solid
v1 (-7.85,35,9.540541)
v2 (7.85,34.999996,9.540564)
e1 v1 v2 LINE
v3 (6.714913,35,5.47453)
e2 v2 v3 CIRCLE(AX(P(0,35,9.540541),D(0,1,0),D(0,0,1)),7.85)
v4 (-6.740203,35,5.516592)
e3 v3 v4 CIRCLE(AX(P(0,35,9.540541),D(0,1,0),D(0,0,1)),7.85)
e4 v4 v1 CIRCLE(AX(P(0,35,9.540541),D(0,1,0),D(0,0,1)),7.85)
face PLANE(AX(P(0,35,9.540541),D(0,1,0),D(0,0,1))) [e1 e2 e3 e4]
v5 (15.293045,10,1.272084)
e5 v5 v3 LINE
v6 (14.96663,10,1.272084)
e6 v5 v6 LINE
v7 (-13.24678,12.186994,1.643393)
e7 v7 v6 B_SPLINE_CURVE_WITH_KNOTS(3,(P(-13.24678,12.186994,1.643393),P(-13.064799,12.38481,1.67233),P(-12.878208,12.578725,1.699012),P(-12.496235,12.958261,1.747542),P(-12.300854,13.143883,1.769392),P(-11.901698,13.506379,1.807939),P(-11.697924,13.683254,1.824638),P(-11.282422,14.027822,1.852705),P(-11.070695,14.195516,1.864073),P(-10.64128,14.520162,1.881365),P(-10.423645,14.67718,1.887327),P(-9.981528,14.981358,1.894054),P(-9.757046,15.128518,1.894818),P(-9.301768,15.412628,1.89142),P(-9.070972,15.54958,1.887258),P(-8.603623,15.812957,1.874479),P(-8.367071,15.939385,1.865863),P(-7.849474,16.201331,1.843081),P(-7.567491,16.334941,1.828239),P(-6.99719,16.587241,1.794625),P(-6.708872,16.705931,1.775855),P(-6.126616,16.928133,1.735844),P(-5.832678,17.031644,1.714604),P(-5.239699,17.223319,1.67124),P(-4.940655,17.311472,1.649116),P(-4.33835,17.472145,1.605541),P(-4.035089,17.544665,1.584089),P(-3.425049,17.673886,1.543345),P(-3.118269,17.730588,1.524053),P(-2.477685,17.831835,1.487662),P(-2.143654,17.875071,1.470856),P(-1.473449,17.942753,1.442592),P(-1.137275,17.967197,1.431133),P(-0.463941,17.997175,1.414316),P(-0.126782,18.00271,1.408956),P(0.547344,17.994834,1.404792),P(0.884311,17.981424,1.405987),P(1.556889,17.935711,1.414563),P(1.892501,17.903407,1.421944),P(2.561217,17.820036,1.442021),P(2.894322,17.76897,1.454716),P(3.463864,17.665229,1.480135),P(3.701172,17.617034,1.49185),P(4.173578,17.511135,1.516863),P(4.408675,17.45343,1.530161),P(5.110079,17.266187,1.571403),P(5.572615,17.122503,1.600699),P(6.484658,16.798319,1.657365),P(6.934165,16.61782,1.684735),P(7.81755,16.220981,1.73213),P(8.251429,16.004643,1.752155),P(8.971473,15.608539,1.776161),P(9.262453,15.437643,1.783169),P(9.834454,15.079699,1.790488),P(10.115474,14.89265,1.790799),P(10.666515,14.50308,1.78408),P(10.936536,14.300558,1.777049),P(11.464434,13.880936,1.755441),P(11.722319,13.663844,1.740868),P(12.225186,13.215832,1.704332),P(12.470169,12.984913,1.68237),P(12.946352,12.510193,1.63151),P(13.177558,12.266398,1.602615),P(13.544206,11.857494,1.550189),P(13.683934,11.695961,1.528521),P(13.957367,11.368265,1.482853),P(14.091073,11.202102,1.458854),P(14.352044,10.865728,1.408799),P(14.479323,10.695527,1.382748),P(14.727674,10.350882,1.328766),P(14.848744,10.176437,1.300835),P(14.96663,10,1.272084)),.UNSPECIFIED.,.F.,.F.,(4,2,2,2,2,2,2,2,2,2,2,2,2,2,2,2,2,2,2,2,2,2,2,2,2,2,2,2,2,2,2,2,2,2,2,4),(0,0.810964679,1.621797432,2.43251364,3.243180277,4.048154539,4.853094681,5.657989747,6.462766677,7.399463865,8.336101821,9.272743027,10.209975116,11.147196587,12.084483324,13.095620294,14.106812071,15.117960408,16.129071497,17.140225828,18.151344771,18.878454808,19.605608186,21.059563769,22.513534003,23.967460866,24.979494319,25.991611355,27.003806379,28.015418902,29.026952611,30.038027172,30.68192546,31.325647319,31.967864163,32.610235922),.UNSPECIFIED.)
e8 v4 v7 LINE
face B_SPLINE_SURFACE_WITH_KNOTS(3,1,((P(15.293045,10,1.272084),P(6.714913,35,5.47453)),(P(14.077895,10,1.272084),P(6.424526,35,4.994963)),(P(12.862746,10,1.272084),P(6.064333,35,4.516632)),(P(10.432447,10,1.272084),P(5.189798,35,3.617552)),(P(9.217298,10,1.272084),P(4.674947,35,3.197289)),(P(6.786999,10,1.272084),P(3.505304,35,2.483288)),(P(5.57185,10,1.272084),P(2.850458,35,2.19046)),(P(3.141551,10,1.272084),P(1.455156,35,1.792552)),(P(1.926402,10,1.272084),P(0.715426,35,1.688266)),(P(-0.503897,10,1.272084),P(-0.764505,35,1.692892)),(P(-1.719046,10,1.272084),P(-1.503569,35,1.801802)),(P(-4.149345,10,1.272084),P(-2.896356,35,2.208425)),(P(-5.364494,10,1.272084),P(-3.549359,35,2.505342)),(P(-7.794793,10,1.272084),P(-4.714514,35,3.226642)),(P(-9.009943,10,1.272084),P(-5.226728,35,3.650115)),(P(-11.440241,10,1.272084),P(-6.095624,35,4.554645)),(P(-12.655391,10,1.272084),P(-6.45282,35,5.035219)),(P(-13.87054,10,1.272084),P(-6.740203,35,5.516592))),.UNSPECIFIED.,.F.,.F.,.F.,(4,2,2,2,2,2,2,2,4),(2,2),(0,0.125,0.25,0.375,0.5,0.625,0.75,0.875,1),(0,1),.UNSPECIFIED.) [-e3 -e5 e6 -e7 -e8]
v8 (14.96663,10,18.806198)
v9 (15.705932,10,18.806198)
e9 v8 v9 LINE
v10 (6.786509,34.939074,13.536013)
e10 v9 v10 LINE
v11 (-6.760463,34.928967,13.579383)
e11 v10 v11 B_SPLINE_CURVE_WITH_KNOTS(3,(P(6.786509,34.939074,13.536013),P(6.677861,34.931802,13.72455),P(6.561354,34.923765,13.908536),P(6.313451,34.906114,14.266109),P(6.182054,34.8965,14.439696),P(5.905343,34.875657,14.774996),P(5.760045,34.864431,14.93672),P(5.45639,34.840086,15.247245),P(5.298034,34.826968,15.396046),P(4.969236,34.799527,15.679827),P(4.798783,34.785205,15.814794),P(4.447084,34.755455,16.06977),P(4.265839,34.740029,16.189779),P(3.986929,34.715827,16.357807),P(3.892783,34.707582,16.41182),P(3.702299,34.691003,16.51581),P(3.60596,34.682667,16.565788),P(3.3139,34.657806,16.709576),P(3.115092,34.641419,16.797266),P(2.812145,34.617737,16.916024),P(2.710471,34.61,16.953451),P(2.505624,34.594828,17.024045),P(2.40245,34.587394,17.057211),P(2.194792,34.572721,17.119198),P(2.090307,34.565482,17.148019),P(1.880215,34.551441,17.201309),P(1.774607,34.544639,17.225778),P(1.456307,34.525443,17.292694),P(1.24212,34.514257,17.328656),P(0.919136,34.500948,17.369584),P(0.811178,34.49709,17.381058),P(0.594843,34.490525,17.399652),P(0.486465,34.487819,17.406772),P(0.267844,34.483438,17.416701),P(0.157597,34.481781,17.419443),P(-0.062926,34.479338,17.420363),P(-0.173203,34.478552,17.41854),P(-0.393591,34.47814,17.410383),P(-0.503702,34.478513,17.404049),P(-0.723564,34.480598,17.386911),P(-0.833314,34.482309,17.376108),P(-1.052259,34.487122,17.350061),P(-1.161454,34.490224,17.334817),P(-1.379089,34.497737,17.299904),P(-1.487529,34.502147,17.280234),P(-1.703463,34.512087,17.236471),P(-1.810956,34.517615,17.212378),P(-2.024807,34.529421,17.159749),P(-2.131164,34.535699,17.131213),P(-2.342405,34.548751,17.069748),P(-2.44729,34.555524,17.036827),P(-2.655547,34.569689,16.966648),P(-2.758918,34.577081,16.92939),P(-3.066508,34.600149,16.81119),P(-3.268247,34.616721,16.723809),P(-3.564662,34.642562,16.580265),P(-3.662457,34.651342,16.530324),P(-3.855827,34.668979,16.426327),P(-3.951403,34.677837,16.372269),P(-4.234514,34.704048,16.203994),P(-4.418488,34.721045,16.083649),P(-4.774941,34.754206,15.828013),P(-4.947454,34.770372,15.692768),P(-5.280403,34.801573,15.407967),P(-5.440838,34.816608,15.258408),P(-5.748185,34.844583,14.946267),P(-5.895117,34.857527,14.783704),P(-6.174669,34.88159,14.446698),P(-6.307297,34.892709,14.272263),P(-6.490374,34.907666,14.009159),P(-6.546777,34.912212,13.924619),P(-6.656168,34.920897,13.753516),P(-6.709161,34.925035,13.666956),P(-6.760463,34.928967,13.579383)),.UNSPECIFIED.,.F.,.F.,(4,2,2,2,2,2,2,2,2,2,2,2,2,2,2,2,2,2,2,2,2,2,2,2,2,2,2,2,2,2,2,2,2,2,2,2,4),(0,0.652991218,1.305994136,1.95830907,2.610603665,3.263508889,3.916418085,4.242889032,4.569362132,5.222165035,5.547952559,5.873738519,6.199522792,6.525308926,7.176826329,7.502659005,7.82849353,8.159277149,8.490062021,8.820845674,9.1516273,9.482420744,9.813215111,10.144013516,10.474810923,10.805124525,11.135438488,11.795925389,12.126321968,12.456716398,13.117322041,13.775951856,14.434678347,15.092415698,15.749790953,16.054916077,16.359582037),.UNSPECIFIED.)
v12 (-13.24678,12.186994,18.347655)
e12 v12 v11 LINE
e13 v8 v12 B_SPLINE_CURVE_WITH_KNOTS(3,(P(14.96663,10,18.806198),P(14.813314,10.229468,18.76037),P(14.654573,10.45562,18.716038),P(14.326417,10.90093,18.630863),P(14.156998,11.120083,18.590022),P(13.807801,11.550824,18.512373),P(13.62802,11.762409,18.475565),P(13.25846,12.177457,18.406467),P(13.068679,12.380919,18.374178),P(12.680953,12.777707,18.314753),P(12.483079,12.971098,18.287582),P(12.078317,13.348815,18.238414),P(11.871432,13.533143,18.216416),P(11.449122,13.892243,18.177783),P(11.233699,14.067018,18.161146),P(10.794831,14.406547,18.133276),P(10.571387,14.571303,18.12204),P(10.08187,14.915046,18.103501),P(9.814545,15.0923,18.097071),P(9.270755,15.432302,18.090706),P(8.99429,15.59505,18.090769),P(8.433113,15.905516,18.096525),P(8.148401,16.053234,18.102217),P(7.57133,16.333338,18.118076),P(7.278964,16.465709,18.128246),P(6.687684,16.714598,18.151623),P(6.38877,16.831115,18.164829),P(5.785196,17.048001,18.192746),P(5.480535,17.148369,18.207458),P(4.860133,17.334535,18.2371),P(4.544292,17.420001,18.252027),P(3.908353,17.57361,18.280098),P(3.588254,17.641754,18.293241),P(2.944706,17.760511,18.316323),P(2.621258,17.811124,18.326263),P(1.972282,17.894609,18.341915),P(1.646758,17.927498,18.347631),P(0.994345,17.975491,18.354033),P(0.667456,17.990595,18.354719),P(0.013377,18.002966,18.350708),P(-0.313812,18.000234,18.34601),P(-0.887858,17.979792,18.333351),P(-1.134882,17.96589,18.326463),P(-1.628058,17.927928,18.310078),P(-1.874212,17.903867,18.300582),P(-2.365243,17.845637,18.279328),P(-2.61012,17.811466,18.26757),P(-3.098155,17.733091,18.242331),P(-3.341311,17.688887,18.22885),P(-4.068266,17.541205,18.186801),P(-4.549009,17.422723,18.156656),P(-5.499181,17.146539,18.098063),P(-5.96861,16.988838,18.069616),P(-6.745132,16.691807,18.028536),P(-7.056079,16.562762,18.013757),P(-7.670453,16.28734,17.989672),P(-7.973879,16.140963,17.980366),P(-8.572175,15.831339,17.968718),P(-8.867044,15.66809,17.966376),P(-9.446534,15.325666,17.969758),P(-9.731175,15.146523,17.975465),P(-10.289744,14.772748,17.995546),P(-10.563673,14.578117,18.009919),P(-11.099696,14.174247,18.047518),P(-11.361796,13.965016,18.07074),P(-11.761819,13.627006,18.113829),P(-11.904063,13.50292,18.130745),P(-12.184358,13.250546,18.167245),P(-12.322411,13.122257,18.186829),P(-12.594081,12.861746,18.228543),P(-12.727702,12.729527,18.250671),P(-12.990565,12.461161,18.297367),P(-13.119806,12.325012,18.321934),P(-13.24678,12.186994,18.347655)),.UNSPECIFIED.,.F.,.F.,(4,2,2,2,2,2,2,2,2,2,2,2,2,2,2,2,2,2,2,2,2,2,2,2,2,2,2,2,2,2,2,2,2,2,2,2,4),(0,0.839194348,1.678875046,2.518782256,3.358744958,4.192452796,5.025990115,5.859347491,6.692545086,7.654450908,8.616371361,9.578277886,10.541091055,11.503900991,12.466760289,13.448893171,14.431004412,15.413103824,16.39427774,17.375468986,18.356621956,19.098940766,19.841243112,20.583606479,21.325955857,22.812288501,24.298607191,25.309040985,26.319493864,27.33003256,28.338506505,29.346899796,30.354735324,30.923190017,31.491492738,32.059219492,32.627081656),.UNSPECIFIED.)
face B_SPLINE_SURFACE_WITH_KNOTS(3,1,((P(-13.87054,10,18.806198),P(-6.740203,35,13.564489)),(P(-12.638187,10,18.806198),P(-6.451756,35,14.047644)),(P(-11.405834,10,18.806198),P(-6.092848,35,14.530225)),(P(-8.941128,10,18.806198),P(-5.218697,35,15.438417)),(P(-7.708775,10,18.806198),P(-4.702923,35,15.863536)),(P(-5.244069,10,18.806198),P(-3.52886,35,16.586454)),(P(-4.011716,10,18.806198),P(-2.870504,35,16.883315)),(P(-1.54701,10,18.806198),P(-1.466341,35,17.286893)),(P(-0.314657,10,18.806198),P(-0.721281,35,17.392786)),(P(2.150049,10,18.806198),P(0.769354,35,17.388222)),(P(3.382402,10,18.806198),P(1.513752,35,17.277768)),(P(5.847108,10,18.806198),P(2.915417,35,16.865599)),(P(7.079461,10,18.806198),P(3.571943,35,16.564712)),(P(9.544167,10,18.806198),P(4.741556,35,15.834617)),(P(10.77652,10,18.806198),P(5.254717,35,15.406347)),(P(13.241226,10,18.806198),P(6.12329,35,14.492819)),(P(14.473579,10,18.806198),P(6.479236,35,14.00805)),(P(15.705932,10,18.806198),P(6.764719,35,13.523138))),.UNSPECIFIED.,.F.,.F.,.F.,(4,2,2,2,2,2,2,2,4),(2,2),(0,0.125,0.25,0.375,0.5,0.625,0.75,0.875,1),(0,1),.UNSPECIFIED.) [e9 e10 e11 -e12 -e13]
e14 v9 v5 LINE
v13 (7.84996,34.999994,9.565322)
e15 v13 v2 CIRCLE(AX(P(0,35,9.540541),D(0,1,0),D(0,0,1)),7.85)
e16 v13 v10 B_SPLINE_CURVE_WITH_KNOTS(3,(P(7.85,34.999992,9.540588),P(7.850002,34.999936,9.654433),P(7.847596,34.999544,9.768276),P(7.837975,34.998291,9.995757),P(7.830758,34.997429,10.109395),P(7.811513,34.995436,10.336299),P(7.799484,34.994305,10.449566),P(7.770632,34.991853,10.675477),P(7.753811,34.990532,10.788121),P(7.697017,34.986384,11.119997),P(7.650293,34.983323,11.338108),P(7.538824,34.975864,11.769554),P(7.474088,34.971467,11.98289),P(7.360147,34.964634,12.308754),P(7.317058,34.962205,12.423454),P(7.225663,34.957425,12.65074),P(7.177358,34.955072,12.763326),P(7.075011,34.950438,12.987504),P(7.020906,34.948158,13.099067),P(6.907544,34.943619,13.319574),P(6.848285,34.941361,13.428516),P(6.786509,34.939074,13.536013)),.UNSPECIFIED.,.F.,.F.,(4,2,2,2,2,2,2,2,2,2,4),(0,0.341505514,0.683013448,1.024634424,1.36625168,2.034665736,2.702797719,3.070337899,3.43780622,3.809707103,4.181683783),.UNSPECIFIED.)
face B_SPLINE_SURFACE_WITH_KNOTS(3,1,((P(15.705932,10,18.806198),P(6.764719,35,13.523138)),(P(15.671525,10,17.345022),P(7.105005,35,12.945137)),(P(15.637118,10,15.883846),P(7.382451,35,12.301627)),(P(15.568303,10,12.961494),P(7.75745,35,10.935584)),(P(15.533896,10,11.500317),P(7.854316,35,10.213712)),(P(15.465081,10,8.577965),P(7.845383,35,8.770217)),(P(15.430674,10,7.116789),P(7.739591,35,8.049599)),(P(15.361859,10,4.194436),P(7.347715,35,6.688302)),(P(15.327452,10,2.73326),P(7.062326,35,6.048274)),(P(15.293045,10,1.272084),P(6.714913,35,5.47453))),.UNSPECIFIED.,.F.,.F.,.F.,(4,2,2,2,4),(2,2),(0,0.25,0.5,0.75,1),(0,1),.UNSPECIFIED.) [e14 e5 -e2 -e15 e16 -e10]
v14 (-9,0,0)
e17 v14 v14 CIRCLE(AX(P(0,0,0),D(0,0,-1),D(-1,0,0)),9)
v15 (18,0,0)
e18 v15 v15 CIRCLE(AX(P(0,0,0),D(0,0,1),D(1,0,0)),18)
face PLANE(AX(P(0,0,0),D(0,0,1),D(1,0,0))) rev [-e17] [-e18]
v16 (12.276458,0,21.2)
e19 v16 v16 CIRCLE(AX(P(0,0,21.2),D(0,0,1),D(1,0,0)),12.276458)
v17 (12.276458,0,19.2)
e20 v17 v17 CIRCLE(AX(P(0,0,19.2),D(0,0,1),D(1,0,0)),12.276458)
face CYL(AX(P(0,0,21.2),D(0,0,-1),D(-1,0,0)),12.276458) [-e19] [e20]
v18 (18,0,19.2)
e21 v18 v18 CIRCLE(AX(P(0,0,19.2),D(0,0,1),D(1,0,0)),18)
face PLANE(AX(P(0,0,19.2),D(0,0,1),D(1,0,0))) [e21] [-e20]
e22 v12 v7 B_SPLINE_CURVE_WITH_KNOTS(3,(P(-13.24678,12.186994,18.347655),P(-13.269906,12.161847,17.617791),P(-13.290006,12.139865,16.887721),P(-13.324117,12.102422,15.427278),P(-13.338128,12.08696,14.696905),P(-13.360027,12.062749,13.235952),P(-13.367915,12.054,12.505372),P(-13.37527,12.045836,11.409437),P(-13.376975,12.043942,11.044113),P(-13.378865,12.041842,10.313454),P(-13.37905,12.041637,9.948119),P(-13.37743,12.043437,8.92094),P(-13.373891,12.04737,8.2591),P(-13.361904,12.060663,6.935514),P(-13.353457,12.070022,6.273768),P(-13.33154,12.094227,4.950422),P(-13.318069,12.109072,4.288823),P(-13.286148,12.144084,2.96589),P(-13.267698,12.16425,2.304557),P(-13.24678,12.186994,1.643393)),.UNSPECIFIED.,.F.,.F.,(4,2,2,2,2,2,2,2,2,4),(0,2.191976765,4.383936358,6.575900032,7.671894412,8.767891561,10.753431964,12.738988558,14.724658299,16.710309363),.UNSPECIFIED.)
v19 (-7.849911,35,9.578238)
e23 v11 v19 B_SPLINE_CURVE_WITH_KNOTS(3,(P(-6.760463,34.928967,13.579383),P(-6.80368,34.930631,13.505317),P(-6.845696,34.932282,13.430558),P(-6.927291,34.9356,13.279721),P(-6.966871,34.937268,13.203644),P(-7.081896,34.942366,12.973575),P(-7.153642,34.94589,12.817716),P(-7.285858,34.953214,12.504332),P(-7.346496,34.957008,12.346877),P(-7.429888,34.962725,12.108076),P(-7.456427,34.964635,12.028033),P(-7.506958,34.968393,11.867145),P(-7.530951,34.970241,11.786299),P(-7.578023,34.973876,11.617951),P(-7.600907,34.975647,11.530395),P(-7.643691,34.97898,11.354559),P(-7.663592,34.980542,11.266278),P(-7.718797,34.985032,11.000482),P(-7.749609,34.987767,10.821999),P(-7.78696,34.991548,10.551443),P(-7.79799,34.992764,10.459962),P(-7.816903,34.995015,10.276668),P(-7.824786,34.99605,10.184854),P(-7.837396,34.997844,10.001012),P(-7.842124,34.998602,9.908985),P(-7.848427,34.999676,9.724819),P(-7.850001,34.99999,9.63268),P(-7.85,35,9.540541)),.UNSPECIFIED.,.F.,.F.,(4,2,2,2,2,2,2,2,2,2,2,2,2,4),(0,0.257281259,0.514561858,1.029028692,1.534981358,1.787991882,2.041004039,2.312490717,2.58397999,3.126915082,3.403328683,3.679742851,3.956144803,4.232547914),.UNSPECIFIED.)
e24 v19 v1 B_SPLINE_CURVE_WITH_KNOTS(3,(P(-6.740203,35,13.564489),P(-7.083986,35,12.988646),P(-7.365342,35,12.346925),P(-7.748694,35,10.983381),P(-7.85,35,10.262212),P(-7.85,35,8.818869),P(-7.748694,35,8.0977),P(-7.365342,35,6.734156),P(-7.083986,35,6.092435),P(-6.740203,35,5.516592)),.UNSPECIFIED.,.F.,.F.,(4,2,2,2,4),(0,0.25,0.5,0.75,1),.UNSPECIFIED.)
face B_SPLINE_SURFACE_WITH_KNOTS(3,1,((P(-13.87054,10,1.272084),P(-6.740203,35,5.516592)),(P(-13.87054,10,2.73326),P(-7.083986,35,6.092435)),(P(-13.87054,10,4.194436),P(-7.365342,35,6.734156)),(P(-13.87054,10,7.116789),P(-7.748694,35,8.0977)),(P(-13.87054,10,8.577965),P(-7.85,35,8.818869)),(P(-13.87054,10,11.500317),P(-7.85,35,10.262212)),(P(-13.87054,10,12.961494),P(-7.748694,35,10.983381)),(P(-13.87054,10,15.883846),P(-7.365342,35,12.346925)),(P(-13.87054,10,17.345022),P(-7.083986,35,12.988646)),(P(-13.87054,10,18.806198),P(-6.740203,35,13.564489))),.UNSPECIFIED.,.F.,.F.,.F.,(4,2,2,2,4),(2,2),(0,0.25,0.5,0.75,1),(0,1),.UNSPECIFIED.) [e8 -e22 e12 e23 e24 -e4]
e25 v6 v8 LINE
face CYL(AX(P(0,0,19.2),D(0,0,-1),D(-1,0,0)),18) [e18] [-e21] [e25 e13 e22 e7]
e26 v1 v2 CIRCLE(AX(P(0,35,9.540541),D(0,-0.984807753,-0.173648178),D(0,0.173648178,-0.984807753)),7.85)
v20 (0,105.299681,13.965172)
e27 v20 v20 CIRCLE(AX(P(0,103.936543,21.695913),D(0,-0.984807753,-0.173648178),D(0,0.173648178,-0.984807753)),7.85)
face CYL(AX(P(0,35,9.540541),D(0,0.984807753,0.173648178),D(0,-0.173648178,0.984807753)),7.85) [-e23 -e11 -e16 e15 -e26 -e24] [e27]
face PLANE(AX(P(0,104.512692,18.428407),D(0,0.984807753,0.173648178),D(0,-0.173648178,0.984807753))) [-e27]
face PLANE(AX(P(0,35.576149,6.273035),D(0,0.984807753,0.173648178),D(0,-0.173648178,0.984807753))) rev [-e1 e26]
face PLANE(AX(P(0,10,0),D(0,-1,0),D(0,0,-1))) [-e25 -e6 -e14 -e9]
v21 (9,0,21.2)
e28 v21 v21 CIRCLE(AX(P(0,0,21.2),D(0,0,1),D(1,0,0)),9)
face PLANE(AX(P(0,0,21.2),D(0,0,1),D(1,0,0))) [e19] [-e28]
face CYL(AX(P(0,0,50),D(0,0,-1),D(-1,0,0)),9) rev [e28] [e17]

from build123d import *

# Parameters (mm, degrees)
SKETCH1_R               = 18
BOSS_EXTRUDE1_DEPTH     = 19.2
SKETCH2_R               = 12.276458432
SKETCH2_R_2             = 8.347690183
BOSS_EXTRUDE2_DEPTH     = 2
SKETCH3_R               = 8.347690183
BOSS_EXTRUDE4_DEPTH     = 6.8
FILLET1_R               = 4
SKETCH13_R              = 9
CUT_EXTRUDE4_DEPTH      = 50
BOSS_EXTRUDE6_START     = 36.124968835
BOSS_EXTRUDE6_OUTLINE_R = 7.85
BOSS_EXTRUDE6_DEPTH     = 70


with BuildPart() as part:
    # Sketch1 → Boss-Extrude1 (new body)
    with BuildSketch(Plane.XY):
        Circle(SKETCH1_R)
    extrude(amount=BOSS_EXTRUDE1_DEPTH)

    # Sketch2 → Boss-Extrude2 (add)
    with BuildSketch(Plane.XY.offset(19.2)):
        Circle(SKETCH2_R)
        Circle(SKETCH2_R_2, mode=Mode.SUBTRACT)
    extrude(amount=BOSS_EXTRUDE2_DEPTH)

    # Sketch3 → Boss-Extrude4 (add)
    with BuildSketch(Plane.XY.offset(19.2)):
        Circle(SKETCH3_R)
    extrude(amount=BOSS_EXTRUDE4_DEPTH)

    # Fillet1
    fillet1_edges = [part.edges().sort_by_distance(p)[0] for p in [
        (-8.347690183, 0, 26),
    ]]
    fillet(fillet1_edges, radius=FILLET1_R)

    # Loft5: read off the stored shape, not the designer's step
    # Loft5: loft between two sections, ruled curve by curve
    loft5_from = [
        Edge.make_bspline([(-13.870540046, 10, 1.272084055), (-13.870540046, 10, 2.733260237), (-13.870540046, 10, 4.19443642), (-13.870540046, 10, 7.116788785), (-13.870540046, 10, 8.577964967), (-13.870540046, 10, 11.500317332), (-13.870540046, 10, 12.961493515), (-13.870540046, 10, 15.88384588), (-13.870540046, 10, 17.345022062), (-13.870540046, 10, 18.806198245)], [0, 0, 0, 0, 0.25, 0.25, 0.5, 0.5, 0.75, 0.75, 1, 1, 1, 1], 3),
        Edge.make_bspline([(-13.870540046, 10, 18.806198245), (-12.638187033, 10, 18.806198245), (-11.40583402, 10, 18.806198245), (-8.941127993, 10, 18.806198245), (-7.70877498, 10, 18.806198245), (-5.244068953, 10, 18.806198245), (-4.01171594, 10, 18.806198245), (-1.547009913, 10, 18.806198245), (-0.3146569, 10, 18.806198245), (2.150049127, 10, 18.806198245), (3.38240214, 10, 18.806198245), (5.847108167, 10, 18.806198245), (7.07946118, 10, 18.806198245), (9.544167207, 10, 18.806198245), (10.77652022, 10, 18.806198245), (13.241226247, 10, 18.806198245), (14.47357926, 10, 18.806198245), (15.705932273, 10, 18.806198245)], [0, 0, 0, 0, 0.125, 0.125, 0.25, 0.25, 0.375, 0.375, 0.5, 0.5, 0.625, 0.625, 0.75, 0.75, 0.875, 0.875, 1, 1, 1, 1], 3),
        Edge.make_bspline([(15.293044741, 10, 1.272084055), (14.077895375, 10, 1.272084055), (12.862746008, 10, 1.272084055), (10.432447276, 10, 1.272084055), (9.21729791, 10, 1.272084055), (6.786999178, 10, 1.272084055), (5.571849812, 10, 1.272084055), (3.141551079, 10, 1.272084055), (1.926401713, 10, 1.272084055), (-0.503897019, 10, 1.272084055), (-1.719046385, 10, 1.272084055), (-4.149345117, 10, 1.272084055), (-5.364494484, 10, 1.272084055), (-7.794793216, 10, 1.272084055), (-9.009942582, 10, 1.272084055), (-11.440241314, 10, 1.272084055), (-12.65539068, 10, 1.272084055), (-13.870540046, 10, 1.272084055)], [0, 0, 0, 0, 0.125, 0.125, 0.25, 0.25, 0.375, 0.375, 0.5, 0.5, 0.625, 0.625, 0.75, 0.75, 0.875, 0.875, 1, 1, 1, 1], 3),
        Edge.make_bspline([(15.705932273, 10, 18.806198245), (15.671524979, 10, 17.345022062), (15.637117685, 10, 15.88384588), (15.568303096, 10, 12.961493515), (15.533895801, 10, 11.500317332), (15.465081213, 10, 8.577964967), (15.430673918, 10, 7.116788785), (15.361859329, 10, 4.19443642), (15.327452035, 10, 2.733260237), (15.293044741, 10, 1.272084055)], [0, 0, 0, 0, 0.25, 0.25, 0.5, 0.5, 0.75, 0.75, 1, 1, 1, 1], 3),
    ]
    loft5_to = [
        Edge.make_bspline([(-6.740203008, 35, 5.516591807), (-7.083985671, 35, 6.09243536), (-7.365341755, 35, 6.734156051), (-7.74869442, 35, 8.097700335), (-7.85, 35, 8.818869121), (-7.85, 35, 10.26221196), (-7.74869442, 35, 10.983380746), (-7.365341755, 35, 12.34692503), (-7.083985671, 35, 12.988645721), (-6.740203008, 35, 13.564489274)], [0, 0, 0, 0, 0.25, 0.25, 0.5, 0.5, 0.75, 0.75, 1, 1, 1, 1], 3),
        Edge.make_bspline([(-6.740203008, 35, 13.564489274), (-6.451756257, 35, 14.047643954), (-6.092847535, 35, 14.530224597), (-5.218696772, 35, 15.438416605), (-4.702923047, 35, 15.863536141), (-3.528860323, 35, 16.586454489), (-2.870504053, 35, 16.883315453), (-1.466341415, 35, 17.286893217), (-0.721281456, 35, 17.392785885), (0.769354223, 35, 17.388221597), (1.513751736, 35, 17.277768249), (2.915416578, 35, 16.865599114), (3.57194256, 35, 16.564712015), (4.741556195, 35, 15.834617391), (5.254716863, 35, 15.406347285), (6.123289567, 35, 14.492819102), (6.479236287, 35, 14.00804959), (6.764718843, 35, 13.523137554)], [0, 0, 0, 0, 0.125, 0.125, 0.25, 0.25, 0.375, 0.375, 0.5, 0.5, 0.625, 0.625, 0.75, 0.75, 0.875, 0.875, 1, 1, 1, 1], 3),
        Edge.make_bspline([(6.714912928, 35, 5.474529674), (6.424525906, 35, 4.994962936), (6.064332724, 35, 4.516631942), (5.189797582, 35, 3.61755227), (4.674946594, 35, 3.197289059), (3.505304255, 35, 2.483288448), (2.850457816, 35, 2.190459602), (1.45515568, 35, 1.792552317), (0.715425599, 35, 1.688265686), (-0.76450524, 35, 1.692892109), (-1.503568847, 35, 1.801801607), (-2.896355935, 35, 2.208424757), (-3.549358764, 35, 2.50534208), (-4.714514202, 35, 3.226641519), (-5.226727577, 35, 3.650115443), (-6.095624443, 35, 4.55464527), (-6.452819986, 35, 5.035218898), (-6.740203008, 35, 5.516591807)], [0, 0, 0, 0, 0.125, 0.125, 0.25, 0.25, 0.375, 0.375, 0.5, 0.5, 0.625, 0.625, 0.75, 0.75, 0.875, 0.875, 1, 1, 1, 1], 3),
        Edge.make_bspline([(6.764718843, 35, 13.523137554), (7.105005207, 35, 12.945137428), (7.382450639, 35, 12.301626641), (7.757449733, 35, 10.935584457), (7.854315981, 35, 10.21371246), (7.845383427, 35, 8.770216678), (7.739590849, 35, 8.049598762), (7.347714599, 35, 6.68830211), (7.062326449, 35, 6.048274216), (6.714912928, 35, 5.474529674)], [0, 0, 0, 0, 0.25, 0.25, 0.5, 0.5, 0.75, 0.75, 1, 1, 1, 1], 3),
    ]
    loft5 = Solid(Shell([*[Face.make_surface_from_curves(loft5_from[k], loft5_to[k]) for k in range(4)], Face(Wire(loft5_from)), Face(Wire(loft5_to))]))
    add(loft5)

    # Sketch13 → Cut-Extrude4 (cut)
    with BuildSketch(Plane(origin=(0, 0, 0), x_dir=(-1, 0, 0), z_dir=(0, 0, -1))):
        Circle(SKETCH13_R)
    extrude(amount=-CUT_EXTRUDE4_DEPTH, mode=Mode.SUBTRACT)


with BuildPart() as boss_extrude6_tool:
    # Boss-Extrude6: read off the stored shape, not the designer's step
    # Boss-Extrude6 outline → Boss-Extrude6 (new body)
    with BuildSketch(Plane(origin=(0, 0, 0), x_dir=(1, 0, 0), z_dir=(0, 0.9848077530122076, 0.1736481776669339)).offset(BOSS_EXTRUDE6_START)):
        with Locations((0, -3.317912074)):
            Circle(BOSS_EXTRUDE6_OUTLINE_R)
    extrude(amount=BOSS_EXTRUDE6_DEPTH)


with BuildPart() as part_1:
    add(part.part)


with BuildPart() as part_2:
    # Boss-Extrude6: joined with boss_extrude6_tool
    add(part_1.part.fuse(boss_extrude6_tool.part, tol=0.00001))


solid = part_2.part
